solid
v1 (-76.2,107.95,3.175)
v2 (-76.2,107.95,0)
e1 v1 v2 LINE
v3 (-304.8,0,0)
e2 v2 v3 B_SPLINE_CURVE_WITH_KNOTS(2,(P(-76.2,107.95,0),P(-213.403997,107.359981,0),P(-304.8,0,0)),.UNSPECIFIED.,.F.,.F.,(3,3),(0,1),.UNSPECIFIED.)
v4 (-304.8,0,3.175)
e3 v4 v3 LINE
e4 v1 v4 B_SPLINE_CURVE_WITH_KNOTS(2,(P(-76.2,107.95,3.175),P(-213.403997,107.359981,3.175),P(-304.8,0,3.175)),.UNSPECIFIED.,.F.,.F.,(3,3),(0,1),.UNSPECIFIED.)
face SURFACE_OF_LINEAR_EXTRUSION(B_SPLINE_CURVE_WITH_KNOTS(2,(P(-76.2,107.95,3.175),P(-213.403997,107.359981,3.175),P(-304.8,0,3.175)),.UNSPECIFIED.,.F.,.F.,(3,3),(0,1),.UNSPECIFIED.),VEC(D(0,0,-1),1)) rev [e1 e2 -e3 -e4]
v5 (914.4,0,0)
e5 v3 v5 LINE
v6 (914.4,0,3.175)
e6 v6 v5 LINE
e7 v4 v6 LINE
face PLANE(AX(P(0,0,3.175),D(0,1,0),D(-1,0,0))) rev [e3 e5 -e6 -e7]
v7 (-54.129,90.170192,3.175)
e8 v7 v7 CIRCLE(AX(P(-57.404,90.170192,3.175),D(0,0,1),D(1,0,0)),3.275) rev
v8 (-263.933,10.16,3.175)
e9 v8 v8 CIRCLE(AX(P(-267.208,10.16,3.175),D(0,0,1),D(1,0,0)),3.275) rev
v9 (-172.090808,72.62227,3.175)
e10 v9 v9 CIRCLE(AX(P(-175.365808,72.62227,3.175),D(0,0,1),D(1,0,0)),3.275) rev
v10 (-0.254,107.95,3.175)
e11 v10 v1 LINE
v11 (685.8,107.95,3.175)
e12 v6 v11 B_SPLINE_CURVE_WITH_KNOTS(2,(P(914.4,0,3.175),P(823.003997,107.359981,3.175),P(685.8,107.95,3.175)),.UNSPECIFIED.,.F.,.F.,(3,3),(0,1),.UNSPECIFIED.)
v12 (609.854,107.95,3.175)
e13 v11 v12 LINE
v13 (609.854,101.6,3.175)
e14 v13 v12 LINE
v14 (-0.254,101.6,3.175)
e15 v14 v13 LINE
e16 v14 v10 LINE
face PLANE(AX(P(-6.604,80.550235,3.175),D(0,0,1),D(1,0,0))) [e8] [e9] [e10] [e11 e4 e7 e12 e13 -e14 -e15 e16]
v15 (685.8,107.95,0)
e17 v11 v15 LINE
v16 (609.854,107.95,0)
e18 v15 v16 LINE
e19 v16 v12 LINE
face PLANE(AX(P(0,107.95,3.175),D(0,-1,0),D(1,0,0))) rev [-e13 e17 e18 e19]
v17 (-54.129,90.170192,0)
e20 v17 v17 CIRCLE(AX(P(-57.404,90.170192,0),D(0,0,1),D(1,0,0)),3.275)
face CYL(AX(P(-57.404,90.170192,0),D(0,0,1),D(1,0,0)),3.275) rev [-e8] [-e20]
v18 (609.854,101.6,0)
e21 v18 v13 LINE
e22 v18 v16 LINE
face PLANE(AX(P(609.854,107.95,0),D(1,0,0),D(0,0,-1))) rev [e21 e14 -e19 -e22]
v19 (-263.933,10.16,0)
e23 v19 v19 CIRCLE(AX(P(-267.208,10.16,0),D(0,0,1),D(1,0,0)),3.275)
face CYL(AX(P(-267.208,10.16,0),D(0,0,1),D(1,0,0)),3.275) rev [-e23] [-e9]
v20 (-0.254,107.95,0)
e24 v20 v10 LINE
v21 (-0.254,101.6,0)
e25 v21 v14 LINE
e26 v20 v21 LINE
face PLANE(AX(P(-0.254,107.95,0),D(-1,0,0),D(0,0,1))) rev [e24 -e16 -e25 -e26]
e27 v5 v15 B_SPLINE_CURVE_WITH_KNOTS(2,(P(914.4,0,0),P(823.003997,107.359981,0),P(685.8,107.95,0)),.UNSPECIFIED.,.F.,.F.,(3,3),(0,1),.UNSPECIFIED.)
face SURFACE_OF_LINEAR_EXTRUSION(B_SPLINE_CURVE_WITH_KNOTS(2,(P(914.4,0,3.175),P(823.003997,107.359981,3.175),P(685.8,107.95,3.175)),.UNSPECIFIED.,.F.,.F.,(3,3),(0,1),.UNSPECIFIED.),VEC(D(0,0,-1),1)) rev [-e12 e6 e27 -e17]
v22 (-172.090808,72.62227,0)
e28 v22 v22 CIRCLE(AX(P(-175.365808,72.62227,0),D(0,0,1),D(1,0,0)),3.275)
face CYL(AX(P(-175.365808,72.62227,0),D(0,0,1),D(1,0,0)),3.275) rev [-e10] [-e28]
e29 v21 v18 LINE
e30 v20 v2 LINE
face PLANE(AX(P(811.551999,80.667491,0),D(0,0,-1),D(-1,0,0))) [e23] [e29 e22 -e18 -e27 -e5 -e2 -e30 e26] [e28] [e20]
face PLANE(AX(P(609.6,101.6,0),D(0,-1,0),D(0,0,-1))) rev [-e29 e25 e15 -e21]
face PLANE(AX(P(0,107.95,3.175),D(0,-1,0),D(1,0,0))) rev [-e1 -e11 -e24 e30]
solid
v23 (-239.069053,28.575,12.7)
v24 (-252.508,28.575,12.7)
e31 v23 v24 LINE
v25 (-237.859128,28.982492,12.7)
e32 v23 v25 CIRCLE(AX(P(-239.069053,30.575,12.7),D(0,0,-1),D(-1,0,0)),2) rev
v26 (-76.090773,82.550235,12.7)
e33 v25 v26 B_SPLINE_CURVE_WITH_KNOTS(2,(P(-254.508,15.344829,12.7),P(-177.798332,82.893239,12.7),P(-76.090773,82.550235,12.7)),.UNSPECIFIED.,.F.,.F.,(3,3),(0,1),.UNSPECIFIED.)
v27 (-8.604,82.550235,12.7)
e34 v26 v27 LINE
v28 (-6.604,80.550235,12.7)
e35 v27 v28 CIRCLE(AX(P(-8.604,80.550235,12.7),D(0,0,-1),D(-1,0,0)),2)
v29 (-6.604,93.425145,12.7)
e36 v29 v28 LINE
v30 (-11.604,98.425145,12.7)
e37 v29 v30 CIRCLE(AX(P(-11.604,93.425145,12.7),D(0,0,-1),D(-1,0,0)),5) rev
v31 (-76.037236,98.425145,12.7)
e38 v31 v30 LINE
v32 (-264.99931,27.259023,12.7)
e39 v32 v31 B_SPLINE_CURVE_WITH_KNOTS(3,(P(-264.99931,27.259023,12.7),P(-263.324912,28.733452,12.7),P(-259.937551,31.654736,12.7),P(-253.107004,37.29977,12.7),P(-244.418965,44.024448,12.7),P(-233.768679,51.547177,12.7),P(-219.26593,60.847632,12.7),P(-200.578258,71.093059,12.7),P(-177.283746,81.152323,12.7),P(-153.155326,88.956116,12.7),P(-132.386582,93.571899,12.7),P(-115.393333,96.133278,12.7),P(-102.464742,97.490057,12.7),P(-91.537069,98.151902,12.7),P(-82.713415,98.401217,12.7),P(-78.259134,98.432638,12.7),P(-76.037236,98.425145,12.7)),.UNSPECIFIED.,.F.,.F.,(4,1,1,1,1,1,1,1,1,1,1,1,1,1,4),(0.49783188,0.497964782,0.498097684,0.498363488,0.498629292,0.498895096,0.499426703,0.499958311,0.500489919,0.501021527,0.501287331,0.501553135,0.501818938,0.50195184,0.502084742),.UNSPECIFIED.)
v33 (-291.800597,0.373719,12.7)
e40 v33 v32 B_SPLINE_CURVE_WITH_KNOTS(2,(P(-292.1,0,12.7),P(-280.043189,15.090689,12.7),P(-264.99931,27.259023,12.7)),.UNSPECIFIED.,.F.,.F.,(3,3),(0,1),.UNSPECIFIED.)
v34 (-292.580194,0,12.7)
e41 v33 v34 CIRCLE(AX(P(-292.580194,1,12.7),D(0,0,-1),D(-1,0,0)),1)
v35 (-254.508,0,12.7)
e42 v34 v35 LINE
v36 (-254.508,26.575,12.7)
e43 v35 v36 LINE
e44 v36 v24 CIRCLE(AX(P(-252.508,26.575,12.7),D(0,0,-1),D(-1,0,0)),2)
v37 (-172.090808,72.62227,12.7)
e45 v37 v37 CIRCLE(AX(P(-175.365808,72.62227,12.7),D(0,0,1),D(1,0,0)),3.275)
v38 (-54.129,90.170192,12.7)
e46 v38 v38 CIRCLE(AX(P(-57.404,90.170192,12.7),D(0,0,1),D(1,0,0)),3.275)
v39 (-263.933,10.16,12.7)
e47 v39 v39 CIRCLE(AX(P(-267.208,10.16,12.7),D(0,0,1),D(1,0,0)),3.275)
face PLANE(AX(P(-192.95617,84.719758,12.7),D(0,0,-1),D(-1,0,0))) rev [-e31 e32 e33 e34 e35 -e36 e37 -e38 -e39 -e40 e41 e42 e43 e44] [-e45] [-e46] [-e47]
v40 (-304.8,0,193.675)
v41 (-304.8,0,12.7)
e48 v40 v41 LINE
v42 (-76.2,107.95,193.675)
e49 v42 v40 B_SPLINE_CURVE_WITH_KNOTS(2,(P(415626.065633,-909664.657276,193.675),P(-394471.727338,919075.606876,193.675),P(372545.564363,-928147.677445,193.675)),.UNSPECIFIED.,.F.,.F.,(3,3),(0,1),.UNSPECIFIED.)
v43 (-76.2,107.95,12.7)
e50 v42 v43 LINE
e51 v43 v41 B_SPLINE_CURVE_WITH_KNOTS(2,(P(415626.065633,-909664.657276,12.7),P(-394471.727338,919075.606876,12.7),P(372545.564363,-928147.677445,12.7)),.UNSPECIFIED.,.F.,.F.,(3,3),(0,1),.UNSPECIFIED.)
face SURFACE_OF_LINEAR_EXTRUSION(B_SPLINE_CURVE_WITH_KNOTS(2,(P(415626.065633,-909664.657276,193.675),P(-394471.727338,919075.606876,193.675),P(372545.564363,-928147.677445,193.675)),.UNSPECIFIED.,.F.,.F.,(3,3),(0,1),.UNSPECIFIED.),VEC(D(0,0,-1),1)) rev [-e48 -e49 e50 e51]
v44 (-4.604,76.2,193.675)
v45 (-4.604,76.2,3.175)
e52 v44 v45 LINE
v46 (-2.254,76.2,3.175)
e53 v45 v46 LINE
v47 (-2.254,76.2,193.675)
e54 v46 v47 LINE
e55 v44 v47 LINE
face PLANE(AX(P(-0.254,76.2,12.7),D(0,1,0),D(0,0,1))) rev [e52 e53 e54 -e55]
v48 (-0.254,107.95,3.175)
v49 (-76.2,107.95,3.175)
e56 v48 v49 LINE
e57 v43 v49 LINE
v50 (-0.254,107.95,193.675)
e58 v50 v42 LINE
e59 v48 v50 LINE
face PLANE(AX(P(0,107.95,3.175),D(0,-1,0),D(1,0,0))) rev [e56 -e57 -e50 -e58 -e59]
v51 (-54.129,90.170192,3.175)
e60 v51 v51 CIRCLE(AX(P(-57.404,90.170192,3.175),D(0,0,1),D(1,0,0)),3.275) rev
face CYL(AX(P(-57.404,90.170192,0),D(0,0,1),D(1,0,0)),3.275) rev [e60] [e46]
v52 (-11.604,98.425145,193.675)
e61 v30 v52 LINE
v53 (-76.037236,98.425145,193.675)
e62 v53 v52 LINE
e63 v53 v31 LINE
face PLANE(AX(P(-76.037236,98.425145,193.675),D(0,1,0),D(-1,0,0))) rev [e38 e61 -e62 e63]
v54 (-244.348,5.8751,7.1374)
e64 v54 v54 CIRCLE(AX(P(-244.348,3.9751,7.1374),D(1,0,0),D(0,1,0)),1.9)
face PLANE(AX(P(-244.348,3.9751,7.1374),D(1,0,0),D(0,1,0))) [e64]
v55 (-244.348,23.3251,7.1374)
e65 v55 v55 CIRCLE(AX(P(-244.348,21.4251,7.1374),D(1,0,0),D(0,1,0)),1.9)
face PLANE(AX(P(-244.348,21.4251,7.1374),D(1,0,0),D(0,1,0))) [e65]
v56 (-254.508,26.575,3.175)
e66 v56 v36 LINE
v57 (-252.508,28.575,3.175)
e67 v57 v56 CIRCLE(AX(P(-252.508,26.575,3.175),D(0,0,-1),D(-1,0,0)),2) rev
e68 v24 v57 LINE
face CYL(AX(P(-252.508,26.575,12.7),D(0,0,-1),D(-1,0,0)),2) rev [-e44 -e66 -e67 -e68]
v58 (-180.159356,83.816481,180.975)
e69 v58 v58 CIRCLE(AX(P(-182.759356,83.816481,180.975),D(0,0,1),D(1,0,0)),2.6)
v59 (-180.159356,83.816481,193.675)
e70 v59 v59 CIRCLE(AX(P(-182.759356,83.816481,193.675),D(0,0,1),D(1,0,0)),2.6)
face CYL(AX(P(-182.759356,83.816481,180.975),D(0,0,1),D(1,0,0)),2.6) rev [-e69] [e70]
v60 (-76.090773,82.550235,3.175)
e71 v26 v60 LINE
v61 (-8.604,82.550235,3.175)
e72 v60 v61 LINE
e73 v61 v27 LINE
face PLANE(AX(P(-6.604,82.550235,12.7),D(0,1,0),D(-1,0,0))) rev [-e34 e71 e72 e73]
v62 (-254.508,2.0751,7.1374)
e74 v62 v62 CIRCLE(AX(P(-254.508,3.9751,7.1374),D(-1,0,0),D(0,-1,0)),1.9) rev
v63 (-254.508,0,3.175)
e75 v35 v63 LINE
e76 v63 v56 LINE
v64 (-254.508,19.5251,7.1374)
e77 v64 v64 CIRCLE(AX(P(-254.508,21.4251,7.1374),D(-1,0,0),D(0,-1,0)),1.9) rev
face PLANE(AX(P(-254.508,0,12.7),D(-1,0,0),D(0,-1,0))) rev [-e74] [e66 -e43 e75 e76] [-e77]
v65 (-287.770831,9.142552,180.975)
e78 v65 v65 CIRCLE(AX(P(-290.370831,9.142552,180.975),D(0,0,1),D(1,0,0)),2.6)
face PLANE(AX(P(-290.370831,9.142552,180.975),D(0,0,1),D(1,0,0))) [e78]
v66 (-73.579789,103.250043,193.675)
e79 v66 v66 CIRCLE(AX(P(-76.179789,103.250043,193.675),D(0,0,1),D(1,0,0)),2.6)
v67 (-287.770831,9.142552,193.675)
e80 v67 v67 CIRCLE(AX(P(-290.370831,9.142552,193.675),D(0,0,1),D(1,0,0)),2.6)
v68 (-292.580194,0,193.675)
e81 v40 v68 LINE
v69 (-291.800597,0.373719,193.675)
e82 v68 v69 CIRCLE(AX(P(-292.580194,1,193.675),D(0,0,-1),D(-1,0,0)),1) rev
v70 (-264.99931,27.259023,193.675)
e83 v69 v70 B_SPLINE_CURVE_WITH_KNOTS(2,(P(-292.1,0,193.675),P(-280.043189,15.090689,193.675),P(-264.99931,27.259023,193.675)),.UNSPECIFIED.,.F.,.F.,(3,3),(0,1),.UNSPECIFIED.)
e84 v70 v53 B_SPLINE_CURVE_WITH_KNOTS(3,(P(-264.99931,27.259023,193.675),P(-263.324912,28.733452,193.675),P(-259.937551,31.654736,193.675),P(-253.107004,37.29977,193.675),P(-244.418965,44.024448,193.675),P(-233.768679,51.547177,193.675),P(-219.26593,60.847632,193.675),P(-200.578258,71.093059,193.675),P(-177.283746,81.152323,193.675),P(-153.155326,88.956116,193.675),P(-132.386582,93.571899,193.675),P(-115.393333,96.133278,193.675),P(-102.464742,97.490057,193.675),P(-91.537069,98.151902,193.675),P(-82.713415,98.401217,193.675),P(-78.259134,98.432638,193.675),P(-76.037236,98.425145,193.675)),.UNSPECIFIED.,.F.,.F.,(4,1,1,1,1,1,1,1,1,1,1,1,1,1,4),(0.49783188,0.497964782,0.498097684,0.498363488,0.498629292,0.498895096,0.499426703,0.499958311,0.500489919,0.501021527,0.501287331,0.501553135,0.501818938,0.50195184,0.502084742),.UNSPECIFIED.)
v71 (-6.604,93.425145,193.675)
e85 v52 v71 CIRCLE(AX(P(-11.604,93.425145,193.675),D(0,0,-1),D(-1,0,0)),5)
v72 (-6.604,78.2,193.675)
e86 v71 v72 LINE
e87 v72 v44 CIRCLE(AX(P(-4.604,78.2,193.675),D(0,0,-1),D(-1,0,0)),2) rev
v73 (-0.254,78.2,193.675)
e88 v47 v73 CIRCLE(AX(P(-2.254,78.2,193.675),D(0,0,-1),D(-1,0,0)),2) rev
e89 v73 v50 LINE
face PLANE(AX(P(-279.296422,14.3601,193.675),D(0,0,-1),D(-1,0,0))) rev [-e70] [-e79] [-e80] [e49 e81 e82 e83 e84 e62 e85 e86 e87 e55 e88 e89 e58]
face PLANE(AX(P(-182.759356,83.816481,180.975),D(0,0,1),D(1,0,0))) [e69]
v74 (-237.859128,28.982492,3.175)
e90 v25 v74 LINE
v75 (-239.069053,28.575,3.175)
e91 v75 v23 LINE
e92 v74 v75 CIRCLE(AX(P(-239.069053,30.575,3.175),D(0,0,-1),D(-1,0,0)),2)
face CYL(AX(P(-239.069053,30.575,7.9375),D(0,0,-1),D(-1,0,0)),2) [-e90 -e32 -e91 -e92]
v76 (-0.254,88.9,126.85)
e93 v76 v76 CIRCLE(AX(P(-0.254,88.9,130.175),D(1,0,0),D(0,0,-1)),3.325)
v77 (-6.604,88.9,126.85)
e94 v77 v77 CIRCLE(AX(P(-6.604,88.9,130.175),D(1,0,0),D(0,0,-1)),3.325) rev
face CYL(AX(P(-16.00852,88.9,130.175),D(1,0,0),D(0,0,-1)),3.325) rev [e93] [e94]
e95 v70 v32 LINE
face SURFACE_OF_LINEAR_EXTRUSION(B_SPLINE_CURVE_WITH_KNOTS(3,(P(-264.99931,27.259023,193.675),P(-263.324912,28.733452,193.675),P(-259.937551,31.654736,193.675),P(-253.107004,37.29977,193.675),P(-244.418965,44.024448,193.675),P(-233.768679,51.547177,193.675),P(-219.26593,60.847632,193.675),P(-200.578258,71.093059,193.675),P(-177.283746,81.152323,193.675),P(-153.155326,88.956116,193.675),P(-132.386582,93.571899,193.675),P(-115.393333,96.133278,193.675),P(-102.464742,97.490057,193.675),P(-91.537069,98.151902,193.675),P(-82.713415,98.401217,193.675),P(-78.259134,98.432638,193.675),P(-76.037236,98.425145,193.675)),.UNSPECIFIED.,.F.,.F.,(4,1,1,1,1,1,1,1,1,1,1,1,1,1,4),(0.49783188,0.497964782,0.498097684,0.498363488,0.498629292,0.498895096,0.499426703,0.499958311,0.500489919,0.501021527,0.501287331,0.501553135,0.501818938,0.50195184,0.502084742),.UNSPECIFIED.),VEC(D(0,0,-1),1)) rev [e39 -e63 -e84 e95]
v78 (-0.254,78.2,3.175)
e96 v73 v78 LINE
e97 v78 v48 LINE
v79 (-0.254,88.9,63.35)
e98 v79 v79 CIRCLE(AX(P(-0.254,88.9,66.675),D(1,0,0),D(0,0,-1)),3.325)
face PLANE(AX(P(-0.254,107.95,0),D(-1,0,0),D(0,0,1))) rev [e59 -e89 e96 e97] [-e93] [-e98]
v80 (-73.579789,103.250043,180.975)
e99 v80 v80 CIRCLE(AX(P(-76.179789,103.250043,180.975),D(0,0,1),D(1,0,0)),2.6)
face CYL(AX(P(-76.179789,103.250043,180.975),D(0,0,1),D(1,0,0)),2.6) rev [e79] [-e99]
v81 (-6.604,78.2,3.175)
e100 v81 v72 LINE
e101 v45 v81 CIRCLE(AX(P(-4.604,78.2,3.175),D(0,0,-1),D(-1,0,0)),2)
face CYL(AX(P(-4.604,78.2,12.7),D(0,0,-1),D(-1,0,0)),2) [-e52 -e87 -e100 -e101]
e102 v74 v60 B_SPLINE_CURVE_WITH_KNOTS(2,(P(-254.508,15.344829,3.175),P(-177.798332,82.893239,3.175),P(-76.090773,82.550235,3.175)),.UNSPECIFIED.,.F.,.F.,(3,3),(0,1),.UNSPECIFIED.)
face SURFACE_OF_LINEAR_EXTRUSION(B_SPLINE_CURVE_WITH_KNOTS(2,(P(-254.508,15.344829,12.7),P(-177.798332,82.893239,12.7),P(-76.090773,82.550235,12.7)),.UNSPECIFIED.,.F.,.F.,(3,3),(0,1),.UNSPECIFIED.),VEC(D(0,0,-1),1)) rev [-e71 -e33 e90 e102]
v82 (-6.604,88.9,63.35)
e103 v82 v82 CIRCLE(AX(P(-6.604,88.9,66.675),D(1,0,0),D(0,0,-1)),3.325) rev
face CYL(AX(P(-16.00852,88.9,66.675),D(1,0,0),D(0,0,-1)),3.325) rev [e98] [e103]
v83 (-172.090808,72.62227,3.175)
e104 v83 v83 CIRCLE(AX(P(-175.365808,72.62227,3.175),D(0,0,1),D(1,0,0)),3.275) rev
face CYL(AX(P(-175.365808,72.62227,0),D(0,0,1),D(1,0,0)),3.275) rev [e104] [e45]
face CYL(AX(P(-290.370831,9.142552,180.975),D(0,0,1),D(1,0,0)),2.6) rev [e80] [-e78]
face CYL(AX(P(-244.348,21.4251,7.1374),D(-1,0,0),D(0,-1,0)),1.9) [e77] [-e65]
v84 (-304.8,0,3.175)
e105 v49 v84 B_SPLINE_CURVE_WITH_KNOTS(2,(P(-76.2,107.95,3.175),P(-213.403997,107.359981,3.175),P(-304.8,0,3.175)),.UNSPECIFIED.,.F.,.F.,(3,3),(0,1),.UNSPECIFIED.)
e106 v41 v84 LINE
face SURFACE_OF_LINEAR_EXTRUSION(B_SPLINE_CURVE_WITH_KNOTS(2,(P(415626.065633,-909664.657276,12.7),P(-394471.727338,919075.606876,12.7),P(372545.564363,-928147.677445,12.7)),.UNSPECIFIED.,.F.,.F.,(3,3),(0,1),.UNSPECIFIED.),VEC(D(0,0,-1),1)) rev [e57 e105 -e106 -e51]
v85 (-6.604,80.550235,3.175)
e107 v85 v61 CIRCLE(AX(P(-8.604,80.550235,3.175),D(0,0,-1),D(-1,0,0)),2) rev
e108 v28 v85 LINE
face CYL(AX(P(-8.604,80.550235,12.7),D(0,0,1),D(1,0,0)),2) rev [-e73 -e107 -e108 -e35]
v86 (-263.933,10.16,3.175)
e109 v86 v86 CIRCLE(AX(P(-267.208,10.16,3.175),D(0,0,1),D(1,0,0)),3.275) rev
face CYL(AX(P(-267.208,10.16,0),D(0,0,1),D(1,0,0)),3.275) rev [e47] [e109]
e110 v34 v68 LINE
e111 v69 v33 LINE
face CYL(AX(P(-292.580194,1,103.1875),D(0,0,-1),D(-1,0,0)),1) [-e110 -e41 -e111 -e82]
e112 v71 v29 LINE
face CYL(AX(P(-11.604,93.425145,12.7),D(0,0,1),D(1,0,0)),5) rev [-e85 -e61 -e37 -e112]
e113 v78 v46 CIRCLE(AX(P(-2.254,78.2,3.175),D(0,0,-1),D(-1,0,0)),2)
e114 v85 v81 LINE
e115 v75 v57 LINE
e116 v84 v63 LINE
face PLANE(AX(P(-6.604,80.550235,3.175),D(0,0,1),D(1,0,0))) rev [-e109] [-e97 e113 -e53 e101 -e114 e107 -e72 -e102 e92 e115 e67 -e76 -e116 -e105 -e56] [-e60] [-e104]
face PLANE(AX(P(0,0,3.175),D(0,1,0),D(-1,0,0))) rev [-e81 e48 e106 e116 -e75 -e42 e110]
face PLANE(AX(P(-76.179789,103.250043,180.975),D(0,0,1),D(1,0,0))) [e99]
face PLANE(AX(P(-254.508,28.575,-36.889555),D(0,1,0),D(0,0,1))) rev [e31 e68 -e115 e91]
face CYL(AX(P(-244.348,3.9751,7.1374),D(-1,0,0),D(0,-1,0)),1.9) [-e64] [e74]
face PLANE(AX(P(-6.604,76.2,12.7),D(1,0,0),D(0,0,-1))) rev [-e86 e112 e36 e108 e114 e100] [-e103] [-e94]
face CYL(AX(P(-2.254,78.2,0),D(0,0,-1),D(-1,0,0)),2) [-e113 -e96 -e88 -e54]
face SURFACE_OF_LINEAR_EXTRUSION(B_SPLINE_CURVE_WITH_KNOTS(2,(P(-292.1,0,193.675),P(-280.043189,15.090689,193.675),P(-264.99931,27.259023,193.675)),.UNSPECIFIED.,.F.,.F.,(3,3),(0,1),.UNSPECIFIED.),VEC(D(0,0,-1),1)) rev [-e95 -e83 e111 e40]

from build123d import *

# Parameters (mm, degrees)
BOSS_EXTRUDE1_DEPTH = 3.175
CUT_EXTRUDE1_DEPTH  = 921.755474233
BOSS_EXTRUDE2_DEPTH = 9.525
BOSS_EXTRUDE3_DEPTH = 180.975
SKETCH6_W           = 28.082698006
SKETCH6_H           = 28.575
CUT_EXTRUDE2_DEPTH  = 9.525
SKETCH7_R           = 3.275
CUT_EXTRUDE3_DEPTH  = 939.366939617
SKETCH8_R           = 3.325
CUT_EXTRUDE5_DEPTH  = 6.35
SKETCH9_R           = 2.6
SKETCH9_R_2         = 2.600000001
CUT_EXTRUDE6_DEPTH  = 12.7
SKETCH11_R          = 1.9
BOSS_EXTRUDE5_DEPTH = 10.16
FILLET1_R           = 5
FILLET2_R           = 2
FILLET3_R           = 1
FILLET4_R           = 2


# Read off the part's stored shape, not the designer's step: Split1
with BuildPart() as part:
    # Sketch1 → Boss-Extrude1 (new body)
    with BuildSketch(Plane.XY):
        with BuildLine():
            Line((0, 0), (-304.8, 0))
            add(Edge.make_bspline(
                [(-304.8, 0), (-213.403997347, 107.359981337), (-76.2, 107.95)],
                knots=[0, 0, 0, 1, 1, 1], degree=2))
            Line((-76.2, 107.95), (0, 107.95))
            Line((0, 107.95), (609.6, 107.95))
            Line((609.6, 107.95), (685.8, 107.95))
            add(Edge.make_bspline(
                [(914.4, 0), (823.003997347, 107.359981337), (685.8, 107.95)],
                knots=[0, 0, 0, 1, 1, 1], degree=2))
            Line((914.4, 0), (609.6, 0))
            Line((609.6, 0), (0, 0))
        make_face()
    extrude(amount=BOSS_EXTRUDE1_DEPTH)

    # Sketch2 → Cut-Extrude1 (cut, through all)
    with BuildSketch(Plane.XY.offset(3.175)):
        Polygon((0, 107.95), (609.6, 107.95), (609.854, 107.95), (609.854, 101.6), (609.6, 101.6), (0, 101.6), (-0.254, 101.6), (-0.254, 107.95), align=None)
    extrude(amount=-CUT_EXTRUDE1_DEPTH, mode=Mode.SUBTRACT)

    # Sketch3 → Boss-Extrude2 (add)
    with BuildSketch(Plane.XY.offset(3.175)):
        with BuildLine():
            Line((-304.8, 0), (-254.508, 0))
            Line((-254.508, 0), (-254.508, 15.344828713))
            add(Edge.make_bspline(
                [(-254.508, 15.344828713), (-177.798332328, 82.893238953), (-76.090773332, 82.550234853)],
                knots=[0, 0, 0, 1, 1, 1], degree=2))
            Line((-76.090773332, 82.550234853), (-6.604, 82.550234853))
            Line((-6.604, 82.550234853), (-6.604, 76.2))
            Line((-6.604, 76.2), (-0.254, 76.2))
            Line((-0.254, 76.2), (-0.254, 107.95))
            Line((-0.254, 107.95), (-76.2, 107.95))
            add(Edge.make_bspline(
                [(-76.2, 107.95), (-213.403997347, 107.359981337), (-304.8, 0)],
                knots=[0, 0, 0, 1, 1, 1], degree=2))
        make_face()
    extrude(amount=BOSS_EXTRUDE2_DEPTH)

    # Sketch5 → Boss-Extrude3 (add)
    with BuildSketch(Plane.XY.offset(12.7)):
        with BuildLine():
            Line((-304.8, 0), (-292.1, 0))
            add(Edge.make_bspline(
                [(-264.999310143, 27.259023461), (-280.043189094, 15.090688978), (-292.1, 0)],
                knots=[0, 0, 0, 1, 1, 1], degree=2))
            add(Edge.make_bspline(
                [(-264.999310143, 27.259023461), (-263.324912471, 28.733451708), (-259.93755133, 31.654735884), (-253.107003874, 37.29977015), (-244.418964995, 44.024448353), (-233.76867915, 51.547177424), (-219.265929961, 60.847632169), (-200.578257731, 71.093058658), (-177.28374589, 81.152323376), (-153.155325898, 88.956116173), (-132.386582303, 93.571898544), (-115.39333326, 96.133277835), (-102.464741628, 97.490056952), (-91.537068573, 98.151901873), (-82.713415498, 98.401217113), (-78.259134389, 98.432637828), (-76.037235922, 98.425144577)],
                knots=[0.49783188, 0.49783188, 0.49783188, 0.49783188, 0.497964782, 0.498097684, 0.498363488, 0.498629292, 0.498895096, 0.499426703, 0.499958311, 0.500489919, 0.501021527, 0.501287331, 0.501553135, 0.501818938, 0.50195184, 0.502084742, 0.502084742, 0.502084742, 0.502084742], degree=3))
            Line((-76.037235922, 98.425144577), (-6.604, 98.425144577))
            Line((-6.604, 98.425144577), (-6.604, 82.550234853))
            Line((-6.604, 82.550234853), (-6.604, 76.2))
            Line((-6.604, 76.2), (-0.254, 76.2))
            Line((-0.254, 76.2), (-0.254, 107.95))
            Line((-0.254, 107.95), (-76.199999999, 107.95))
            add(Edge.make_bspline(
                [(-76.199999999, 107.95), (-213.403997347, 107.359981337), (-304.8, 0)],
                knots=[0, 0, 0, 1, 1, 1], degree=2))
        make_face()
    extrude(amount=BOSS_EXTRUDE3_DEPTH)

    # Sketch6 → Cut-Extrude2 (cut)
    with BuildSketch(Plane.XY.offset(12.7)):
        with Locations((-240.466650997, 14.2875)):
            Rectangle(SKETCH6_W, SKETCH6_H)
    extrude(amount=-CUT_EXTRUDE2_DEPTH, mode=Mode.SUBTRACT)

    # Sketch7 → Cut-Extrude3 (cut, through all)
    with BuildSketch(Plane.XY.offset(12.7)):
        with Locations((-267.208, 10.16)):
            Circle(SKETCH7_R)
        with Locations((-175.365808452, 72.622269579)):
            Circle(SKETCH7_R)
        with Locations((-57.404, 90.17019152)):
            Circle(SKETCH7_R)
    extrude(amount=-CUT_EXTRUDE3_DEPTH, mode=Mode.SUBTRACT)

    # Sketch8 → Cut-Extrude5 (cut)
    with BuildSketch(Plane(origin=(-0.254, 0, 0), x_dir=(0, 0, -1), z_dir=(1, 0, 0))):
        with Locations((-66.675, 88.9)):
            Circle(SKETCH8_R)
        with Locations((-130.175, 88.9)):
            Circle(SKETCH8_R)
    extrude(amount=-CUT_EXTRUDE5_DEPTH, mode=Mode.SUBTRACT)

    # Sketch9 → Cut-Extrude6 (cut)
    with BuildSketch(Plane.XY.offset(193.675)):
        with Locations((-290.370830702, 9.142552388)):
            Circle(SKETCH9_R)
        with Locations((-182.759356376, 83.816480509)):
            Circle(SKETCH9_R)
        with Locations((-76.179788765, 103.250043457)):
            Circle(SKETCH9_R_2)
    extrude(amount=-CUT_EXTRUDE6_DEPTH, mode=Mode.SUBTRACT)

    # Sketch11 → Boss-Extrude5 (add)
    with BuildSketch(Plane(origin=(-254.508, 2e-09, 0), x_dir=(0, 0, -1), z_dir=(1.0, -6.037741648177811e-12, 0))):
        with Locations(Location((-7.1374, 3.975099998, 0), (0, 0, 270))):
            Circle(SKETCH11_R)
        with Locations(Location((-7.1374, 21.425099998, 0), (0, 0, 270))):
            Circle(SKETCH11_R)
    extrude(amount=BOSS_EXTRUDE5_DEPTH)

    # Fillet1
    fillet1_edges = [part.edges().sort_by_distance(p)[0] for p in [
        (-6.604, 98.425144577, 103.1875),
    ]]
    fillet(fillet1_edges, radius=FILLET1_R)

    # Fillet2
    fillet2_edges = [part.edges().sort_by_distance(p)[0] for p in [
        (-238.394170448, 28.575, 7.9375),
        (-254.508, 28.575, 7.9375),
    ]]
    fillet(fillet2_edges, radius=FILLET2_R)

    # Fillet3
    # the kernel refuses this fillet: 1 mm, written as the material it takes off along each edge
    with BuildSketch(Plane(origin=(-292.1, 0, 12.7), x_dir=(0.6252400597778598, 0.7804324875663354, 0), z_dir=(0, 0, 1))) as fillet3_piece_1:
        with BuildLine():
            CenterArc((0.480195921, 0.999999109), FILLET3_R, 218.699809372, 51.223710378)
            Line((-0.300236566, 0.374759049), (-0.315845216, 0.362254248))
            Line((-0.315845216, 0.362254248), (-0.01560865, -0.012504801))
            Line((-0.01560865, -0.012504801), (2.669e-05, -0.019999982))
            ThreePointArc((2.669e-05, -0.019999982), (0.239430546, -0.019840221), (0.478834393, -0.019999982))
            Line((0.478834393, -0.019999982), (0.478861089, 0))
        make_face()
    extrude(amount=180.975, mode=Mode.SUBTRACT)

    # Fillet4
    fillet4_edges = [part.edges().sort_by_distance(p)[0] for p in [
        (-6.604, 82.550234853, 7.9375),
        (-6.604, 76.2, 98.425),
        (-0.254, 76.2, 98.425),
    ]]
    fillet(fillet4_edges, radius=FILLET4_R)


with BuildPart() as body_2:
    # Split1: the piece on the far side of the plane
    add(part.part)
    split(bisect_by=Plane.XY.offset(3.175), keep=Keep.BOTTOM)


with BuildPart() as part_1:
    add(part.part)

    # Split1
    split(bisect_by=Plane.XY.offset(3.175), keep=Keep.TOP)


solid = Compound([body_2.part, part_1.part])
